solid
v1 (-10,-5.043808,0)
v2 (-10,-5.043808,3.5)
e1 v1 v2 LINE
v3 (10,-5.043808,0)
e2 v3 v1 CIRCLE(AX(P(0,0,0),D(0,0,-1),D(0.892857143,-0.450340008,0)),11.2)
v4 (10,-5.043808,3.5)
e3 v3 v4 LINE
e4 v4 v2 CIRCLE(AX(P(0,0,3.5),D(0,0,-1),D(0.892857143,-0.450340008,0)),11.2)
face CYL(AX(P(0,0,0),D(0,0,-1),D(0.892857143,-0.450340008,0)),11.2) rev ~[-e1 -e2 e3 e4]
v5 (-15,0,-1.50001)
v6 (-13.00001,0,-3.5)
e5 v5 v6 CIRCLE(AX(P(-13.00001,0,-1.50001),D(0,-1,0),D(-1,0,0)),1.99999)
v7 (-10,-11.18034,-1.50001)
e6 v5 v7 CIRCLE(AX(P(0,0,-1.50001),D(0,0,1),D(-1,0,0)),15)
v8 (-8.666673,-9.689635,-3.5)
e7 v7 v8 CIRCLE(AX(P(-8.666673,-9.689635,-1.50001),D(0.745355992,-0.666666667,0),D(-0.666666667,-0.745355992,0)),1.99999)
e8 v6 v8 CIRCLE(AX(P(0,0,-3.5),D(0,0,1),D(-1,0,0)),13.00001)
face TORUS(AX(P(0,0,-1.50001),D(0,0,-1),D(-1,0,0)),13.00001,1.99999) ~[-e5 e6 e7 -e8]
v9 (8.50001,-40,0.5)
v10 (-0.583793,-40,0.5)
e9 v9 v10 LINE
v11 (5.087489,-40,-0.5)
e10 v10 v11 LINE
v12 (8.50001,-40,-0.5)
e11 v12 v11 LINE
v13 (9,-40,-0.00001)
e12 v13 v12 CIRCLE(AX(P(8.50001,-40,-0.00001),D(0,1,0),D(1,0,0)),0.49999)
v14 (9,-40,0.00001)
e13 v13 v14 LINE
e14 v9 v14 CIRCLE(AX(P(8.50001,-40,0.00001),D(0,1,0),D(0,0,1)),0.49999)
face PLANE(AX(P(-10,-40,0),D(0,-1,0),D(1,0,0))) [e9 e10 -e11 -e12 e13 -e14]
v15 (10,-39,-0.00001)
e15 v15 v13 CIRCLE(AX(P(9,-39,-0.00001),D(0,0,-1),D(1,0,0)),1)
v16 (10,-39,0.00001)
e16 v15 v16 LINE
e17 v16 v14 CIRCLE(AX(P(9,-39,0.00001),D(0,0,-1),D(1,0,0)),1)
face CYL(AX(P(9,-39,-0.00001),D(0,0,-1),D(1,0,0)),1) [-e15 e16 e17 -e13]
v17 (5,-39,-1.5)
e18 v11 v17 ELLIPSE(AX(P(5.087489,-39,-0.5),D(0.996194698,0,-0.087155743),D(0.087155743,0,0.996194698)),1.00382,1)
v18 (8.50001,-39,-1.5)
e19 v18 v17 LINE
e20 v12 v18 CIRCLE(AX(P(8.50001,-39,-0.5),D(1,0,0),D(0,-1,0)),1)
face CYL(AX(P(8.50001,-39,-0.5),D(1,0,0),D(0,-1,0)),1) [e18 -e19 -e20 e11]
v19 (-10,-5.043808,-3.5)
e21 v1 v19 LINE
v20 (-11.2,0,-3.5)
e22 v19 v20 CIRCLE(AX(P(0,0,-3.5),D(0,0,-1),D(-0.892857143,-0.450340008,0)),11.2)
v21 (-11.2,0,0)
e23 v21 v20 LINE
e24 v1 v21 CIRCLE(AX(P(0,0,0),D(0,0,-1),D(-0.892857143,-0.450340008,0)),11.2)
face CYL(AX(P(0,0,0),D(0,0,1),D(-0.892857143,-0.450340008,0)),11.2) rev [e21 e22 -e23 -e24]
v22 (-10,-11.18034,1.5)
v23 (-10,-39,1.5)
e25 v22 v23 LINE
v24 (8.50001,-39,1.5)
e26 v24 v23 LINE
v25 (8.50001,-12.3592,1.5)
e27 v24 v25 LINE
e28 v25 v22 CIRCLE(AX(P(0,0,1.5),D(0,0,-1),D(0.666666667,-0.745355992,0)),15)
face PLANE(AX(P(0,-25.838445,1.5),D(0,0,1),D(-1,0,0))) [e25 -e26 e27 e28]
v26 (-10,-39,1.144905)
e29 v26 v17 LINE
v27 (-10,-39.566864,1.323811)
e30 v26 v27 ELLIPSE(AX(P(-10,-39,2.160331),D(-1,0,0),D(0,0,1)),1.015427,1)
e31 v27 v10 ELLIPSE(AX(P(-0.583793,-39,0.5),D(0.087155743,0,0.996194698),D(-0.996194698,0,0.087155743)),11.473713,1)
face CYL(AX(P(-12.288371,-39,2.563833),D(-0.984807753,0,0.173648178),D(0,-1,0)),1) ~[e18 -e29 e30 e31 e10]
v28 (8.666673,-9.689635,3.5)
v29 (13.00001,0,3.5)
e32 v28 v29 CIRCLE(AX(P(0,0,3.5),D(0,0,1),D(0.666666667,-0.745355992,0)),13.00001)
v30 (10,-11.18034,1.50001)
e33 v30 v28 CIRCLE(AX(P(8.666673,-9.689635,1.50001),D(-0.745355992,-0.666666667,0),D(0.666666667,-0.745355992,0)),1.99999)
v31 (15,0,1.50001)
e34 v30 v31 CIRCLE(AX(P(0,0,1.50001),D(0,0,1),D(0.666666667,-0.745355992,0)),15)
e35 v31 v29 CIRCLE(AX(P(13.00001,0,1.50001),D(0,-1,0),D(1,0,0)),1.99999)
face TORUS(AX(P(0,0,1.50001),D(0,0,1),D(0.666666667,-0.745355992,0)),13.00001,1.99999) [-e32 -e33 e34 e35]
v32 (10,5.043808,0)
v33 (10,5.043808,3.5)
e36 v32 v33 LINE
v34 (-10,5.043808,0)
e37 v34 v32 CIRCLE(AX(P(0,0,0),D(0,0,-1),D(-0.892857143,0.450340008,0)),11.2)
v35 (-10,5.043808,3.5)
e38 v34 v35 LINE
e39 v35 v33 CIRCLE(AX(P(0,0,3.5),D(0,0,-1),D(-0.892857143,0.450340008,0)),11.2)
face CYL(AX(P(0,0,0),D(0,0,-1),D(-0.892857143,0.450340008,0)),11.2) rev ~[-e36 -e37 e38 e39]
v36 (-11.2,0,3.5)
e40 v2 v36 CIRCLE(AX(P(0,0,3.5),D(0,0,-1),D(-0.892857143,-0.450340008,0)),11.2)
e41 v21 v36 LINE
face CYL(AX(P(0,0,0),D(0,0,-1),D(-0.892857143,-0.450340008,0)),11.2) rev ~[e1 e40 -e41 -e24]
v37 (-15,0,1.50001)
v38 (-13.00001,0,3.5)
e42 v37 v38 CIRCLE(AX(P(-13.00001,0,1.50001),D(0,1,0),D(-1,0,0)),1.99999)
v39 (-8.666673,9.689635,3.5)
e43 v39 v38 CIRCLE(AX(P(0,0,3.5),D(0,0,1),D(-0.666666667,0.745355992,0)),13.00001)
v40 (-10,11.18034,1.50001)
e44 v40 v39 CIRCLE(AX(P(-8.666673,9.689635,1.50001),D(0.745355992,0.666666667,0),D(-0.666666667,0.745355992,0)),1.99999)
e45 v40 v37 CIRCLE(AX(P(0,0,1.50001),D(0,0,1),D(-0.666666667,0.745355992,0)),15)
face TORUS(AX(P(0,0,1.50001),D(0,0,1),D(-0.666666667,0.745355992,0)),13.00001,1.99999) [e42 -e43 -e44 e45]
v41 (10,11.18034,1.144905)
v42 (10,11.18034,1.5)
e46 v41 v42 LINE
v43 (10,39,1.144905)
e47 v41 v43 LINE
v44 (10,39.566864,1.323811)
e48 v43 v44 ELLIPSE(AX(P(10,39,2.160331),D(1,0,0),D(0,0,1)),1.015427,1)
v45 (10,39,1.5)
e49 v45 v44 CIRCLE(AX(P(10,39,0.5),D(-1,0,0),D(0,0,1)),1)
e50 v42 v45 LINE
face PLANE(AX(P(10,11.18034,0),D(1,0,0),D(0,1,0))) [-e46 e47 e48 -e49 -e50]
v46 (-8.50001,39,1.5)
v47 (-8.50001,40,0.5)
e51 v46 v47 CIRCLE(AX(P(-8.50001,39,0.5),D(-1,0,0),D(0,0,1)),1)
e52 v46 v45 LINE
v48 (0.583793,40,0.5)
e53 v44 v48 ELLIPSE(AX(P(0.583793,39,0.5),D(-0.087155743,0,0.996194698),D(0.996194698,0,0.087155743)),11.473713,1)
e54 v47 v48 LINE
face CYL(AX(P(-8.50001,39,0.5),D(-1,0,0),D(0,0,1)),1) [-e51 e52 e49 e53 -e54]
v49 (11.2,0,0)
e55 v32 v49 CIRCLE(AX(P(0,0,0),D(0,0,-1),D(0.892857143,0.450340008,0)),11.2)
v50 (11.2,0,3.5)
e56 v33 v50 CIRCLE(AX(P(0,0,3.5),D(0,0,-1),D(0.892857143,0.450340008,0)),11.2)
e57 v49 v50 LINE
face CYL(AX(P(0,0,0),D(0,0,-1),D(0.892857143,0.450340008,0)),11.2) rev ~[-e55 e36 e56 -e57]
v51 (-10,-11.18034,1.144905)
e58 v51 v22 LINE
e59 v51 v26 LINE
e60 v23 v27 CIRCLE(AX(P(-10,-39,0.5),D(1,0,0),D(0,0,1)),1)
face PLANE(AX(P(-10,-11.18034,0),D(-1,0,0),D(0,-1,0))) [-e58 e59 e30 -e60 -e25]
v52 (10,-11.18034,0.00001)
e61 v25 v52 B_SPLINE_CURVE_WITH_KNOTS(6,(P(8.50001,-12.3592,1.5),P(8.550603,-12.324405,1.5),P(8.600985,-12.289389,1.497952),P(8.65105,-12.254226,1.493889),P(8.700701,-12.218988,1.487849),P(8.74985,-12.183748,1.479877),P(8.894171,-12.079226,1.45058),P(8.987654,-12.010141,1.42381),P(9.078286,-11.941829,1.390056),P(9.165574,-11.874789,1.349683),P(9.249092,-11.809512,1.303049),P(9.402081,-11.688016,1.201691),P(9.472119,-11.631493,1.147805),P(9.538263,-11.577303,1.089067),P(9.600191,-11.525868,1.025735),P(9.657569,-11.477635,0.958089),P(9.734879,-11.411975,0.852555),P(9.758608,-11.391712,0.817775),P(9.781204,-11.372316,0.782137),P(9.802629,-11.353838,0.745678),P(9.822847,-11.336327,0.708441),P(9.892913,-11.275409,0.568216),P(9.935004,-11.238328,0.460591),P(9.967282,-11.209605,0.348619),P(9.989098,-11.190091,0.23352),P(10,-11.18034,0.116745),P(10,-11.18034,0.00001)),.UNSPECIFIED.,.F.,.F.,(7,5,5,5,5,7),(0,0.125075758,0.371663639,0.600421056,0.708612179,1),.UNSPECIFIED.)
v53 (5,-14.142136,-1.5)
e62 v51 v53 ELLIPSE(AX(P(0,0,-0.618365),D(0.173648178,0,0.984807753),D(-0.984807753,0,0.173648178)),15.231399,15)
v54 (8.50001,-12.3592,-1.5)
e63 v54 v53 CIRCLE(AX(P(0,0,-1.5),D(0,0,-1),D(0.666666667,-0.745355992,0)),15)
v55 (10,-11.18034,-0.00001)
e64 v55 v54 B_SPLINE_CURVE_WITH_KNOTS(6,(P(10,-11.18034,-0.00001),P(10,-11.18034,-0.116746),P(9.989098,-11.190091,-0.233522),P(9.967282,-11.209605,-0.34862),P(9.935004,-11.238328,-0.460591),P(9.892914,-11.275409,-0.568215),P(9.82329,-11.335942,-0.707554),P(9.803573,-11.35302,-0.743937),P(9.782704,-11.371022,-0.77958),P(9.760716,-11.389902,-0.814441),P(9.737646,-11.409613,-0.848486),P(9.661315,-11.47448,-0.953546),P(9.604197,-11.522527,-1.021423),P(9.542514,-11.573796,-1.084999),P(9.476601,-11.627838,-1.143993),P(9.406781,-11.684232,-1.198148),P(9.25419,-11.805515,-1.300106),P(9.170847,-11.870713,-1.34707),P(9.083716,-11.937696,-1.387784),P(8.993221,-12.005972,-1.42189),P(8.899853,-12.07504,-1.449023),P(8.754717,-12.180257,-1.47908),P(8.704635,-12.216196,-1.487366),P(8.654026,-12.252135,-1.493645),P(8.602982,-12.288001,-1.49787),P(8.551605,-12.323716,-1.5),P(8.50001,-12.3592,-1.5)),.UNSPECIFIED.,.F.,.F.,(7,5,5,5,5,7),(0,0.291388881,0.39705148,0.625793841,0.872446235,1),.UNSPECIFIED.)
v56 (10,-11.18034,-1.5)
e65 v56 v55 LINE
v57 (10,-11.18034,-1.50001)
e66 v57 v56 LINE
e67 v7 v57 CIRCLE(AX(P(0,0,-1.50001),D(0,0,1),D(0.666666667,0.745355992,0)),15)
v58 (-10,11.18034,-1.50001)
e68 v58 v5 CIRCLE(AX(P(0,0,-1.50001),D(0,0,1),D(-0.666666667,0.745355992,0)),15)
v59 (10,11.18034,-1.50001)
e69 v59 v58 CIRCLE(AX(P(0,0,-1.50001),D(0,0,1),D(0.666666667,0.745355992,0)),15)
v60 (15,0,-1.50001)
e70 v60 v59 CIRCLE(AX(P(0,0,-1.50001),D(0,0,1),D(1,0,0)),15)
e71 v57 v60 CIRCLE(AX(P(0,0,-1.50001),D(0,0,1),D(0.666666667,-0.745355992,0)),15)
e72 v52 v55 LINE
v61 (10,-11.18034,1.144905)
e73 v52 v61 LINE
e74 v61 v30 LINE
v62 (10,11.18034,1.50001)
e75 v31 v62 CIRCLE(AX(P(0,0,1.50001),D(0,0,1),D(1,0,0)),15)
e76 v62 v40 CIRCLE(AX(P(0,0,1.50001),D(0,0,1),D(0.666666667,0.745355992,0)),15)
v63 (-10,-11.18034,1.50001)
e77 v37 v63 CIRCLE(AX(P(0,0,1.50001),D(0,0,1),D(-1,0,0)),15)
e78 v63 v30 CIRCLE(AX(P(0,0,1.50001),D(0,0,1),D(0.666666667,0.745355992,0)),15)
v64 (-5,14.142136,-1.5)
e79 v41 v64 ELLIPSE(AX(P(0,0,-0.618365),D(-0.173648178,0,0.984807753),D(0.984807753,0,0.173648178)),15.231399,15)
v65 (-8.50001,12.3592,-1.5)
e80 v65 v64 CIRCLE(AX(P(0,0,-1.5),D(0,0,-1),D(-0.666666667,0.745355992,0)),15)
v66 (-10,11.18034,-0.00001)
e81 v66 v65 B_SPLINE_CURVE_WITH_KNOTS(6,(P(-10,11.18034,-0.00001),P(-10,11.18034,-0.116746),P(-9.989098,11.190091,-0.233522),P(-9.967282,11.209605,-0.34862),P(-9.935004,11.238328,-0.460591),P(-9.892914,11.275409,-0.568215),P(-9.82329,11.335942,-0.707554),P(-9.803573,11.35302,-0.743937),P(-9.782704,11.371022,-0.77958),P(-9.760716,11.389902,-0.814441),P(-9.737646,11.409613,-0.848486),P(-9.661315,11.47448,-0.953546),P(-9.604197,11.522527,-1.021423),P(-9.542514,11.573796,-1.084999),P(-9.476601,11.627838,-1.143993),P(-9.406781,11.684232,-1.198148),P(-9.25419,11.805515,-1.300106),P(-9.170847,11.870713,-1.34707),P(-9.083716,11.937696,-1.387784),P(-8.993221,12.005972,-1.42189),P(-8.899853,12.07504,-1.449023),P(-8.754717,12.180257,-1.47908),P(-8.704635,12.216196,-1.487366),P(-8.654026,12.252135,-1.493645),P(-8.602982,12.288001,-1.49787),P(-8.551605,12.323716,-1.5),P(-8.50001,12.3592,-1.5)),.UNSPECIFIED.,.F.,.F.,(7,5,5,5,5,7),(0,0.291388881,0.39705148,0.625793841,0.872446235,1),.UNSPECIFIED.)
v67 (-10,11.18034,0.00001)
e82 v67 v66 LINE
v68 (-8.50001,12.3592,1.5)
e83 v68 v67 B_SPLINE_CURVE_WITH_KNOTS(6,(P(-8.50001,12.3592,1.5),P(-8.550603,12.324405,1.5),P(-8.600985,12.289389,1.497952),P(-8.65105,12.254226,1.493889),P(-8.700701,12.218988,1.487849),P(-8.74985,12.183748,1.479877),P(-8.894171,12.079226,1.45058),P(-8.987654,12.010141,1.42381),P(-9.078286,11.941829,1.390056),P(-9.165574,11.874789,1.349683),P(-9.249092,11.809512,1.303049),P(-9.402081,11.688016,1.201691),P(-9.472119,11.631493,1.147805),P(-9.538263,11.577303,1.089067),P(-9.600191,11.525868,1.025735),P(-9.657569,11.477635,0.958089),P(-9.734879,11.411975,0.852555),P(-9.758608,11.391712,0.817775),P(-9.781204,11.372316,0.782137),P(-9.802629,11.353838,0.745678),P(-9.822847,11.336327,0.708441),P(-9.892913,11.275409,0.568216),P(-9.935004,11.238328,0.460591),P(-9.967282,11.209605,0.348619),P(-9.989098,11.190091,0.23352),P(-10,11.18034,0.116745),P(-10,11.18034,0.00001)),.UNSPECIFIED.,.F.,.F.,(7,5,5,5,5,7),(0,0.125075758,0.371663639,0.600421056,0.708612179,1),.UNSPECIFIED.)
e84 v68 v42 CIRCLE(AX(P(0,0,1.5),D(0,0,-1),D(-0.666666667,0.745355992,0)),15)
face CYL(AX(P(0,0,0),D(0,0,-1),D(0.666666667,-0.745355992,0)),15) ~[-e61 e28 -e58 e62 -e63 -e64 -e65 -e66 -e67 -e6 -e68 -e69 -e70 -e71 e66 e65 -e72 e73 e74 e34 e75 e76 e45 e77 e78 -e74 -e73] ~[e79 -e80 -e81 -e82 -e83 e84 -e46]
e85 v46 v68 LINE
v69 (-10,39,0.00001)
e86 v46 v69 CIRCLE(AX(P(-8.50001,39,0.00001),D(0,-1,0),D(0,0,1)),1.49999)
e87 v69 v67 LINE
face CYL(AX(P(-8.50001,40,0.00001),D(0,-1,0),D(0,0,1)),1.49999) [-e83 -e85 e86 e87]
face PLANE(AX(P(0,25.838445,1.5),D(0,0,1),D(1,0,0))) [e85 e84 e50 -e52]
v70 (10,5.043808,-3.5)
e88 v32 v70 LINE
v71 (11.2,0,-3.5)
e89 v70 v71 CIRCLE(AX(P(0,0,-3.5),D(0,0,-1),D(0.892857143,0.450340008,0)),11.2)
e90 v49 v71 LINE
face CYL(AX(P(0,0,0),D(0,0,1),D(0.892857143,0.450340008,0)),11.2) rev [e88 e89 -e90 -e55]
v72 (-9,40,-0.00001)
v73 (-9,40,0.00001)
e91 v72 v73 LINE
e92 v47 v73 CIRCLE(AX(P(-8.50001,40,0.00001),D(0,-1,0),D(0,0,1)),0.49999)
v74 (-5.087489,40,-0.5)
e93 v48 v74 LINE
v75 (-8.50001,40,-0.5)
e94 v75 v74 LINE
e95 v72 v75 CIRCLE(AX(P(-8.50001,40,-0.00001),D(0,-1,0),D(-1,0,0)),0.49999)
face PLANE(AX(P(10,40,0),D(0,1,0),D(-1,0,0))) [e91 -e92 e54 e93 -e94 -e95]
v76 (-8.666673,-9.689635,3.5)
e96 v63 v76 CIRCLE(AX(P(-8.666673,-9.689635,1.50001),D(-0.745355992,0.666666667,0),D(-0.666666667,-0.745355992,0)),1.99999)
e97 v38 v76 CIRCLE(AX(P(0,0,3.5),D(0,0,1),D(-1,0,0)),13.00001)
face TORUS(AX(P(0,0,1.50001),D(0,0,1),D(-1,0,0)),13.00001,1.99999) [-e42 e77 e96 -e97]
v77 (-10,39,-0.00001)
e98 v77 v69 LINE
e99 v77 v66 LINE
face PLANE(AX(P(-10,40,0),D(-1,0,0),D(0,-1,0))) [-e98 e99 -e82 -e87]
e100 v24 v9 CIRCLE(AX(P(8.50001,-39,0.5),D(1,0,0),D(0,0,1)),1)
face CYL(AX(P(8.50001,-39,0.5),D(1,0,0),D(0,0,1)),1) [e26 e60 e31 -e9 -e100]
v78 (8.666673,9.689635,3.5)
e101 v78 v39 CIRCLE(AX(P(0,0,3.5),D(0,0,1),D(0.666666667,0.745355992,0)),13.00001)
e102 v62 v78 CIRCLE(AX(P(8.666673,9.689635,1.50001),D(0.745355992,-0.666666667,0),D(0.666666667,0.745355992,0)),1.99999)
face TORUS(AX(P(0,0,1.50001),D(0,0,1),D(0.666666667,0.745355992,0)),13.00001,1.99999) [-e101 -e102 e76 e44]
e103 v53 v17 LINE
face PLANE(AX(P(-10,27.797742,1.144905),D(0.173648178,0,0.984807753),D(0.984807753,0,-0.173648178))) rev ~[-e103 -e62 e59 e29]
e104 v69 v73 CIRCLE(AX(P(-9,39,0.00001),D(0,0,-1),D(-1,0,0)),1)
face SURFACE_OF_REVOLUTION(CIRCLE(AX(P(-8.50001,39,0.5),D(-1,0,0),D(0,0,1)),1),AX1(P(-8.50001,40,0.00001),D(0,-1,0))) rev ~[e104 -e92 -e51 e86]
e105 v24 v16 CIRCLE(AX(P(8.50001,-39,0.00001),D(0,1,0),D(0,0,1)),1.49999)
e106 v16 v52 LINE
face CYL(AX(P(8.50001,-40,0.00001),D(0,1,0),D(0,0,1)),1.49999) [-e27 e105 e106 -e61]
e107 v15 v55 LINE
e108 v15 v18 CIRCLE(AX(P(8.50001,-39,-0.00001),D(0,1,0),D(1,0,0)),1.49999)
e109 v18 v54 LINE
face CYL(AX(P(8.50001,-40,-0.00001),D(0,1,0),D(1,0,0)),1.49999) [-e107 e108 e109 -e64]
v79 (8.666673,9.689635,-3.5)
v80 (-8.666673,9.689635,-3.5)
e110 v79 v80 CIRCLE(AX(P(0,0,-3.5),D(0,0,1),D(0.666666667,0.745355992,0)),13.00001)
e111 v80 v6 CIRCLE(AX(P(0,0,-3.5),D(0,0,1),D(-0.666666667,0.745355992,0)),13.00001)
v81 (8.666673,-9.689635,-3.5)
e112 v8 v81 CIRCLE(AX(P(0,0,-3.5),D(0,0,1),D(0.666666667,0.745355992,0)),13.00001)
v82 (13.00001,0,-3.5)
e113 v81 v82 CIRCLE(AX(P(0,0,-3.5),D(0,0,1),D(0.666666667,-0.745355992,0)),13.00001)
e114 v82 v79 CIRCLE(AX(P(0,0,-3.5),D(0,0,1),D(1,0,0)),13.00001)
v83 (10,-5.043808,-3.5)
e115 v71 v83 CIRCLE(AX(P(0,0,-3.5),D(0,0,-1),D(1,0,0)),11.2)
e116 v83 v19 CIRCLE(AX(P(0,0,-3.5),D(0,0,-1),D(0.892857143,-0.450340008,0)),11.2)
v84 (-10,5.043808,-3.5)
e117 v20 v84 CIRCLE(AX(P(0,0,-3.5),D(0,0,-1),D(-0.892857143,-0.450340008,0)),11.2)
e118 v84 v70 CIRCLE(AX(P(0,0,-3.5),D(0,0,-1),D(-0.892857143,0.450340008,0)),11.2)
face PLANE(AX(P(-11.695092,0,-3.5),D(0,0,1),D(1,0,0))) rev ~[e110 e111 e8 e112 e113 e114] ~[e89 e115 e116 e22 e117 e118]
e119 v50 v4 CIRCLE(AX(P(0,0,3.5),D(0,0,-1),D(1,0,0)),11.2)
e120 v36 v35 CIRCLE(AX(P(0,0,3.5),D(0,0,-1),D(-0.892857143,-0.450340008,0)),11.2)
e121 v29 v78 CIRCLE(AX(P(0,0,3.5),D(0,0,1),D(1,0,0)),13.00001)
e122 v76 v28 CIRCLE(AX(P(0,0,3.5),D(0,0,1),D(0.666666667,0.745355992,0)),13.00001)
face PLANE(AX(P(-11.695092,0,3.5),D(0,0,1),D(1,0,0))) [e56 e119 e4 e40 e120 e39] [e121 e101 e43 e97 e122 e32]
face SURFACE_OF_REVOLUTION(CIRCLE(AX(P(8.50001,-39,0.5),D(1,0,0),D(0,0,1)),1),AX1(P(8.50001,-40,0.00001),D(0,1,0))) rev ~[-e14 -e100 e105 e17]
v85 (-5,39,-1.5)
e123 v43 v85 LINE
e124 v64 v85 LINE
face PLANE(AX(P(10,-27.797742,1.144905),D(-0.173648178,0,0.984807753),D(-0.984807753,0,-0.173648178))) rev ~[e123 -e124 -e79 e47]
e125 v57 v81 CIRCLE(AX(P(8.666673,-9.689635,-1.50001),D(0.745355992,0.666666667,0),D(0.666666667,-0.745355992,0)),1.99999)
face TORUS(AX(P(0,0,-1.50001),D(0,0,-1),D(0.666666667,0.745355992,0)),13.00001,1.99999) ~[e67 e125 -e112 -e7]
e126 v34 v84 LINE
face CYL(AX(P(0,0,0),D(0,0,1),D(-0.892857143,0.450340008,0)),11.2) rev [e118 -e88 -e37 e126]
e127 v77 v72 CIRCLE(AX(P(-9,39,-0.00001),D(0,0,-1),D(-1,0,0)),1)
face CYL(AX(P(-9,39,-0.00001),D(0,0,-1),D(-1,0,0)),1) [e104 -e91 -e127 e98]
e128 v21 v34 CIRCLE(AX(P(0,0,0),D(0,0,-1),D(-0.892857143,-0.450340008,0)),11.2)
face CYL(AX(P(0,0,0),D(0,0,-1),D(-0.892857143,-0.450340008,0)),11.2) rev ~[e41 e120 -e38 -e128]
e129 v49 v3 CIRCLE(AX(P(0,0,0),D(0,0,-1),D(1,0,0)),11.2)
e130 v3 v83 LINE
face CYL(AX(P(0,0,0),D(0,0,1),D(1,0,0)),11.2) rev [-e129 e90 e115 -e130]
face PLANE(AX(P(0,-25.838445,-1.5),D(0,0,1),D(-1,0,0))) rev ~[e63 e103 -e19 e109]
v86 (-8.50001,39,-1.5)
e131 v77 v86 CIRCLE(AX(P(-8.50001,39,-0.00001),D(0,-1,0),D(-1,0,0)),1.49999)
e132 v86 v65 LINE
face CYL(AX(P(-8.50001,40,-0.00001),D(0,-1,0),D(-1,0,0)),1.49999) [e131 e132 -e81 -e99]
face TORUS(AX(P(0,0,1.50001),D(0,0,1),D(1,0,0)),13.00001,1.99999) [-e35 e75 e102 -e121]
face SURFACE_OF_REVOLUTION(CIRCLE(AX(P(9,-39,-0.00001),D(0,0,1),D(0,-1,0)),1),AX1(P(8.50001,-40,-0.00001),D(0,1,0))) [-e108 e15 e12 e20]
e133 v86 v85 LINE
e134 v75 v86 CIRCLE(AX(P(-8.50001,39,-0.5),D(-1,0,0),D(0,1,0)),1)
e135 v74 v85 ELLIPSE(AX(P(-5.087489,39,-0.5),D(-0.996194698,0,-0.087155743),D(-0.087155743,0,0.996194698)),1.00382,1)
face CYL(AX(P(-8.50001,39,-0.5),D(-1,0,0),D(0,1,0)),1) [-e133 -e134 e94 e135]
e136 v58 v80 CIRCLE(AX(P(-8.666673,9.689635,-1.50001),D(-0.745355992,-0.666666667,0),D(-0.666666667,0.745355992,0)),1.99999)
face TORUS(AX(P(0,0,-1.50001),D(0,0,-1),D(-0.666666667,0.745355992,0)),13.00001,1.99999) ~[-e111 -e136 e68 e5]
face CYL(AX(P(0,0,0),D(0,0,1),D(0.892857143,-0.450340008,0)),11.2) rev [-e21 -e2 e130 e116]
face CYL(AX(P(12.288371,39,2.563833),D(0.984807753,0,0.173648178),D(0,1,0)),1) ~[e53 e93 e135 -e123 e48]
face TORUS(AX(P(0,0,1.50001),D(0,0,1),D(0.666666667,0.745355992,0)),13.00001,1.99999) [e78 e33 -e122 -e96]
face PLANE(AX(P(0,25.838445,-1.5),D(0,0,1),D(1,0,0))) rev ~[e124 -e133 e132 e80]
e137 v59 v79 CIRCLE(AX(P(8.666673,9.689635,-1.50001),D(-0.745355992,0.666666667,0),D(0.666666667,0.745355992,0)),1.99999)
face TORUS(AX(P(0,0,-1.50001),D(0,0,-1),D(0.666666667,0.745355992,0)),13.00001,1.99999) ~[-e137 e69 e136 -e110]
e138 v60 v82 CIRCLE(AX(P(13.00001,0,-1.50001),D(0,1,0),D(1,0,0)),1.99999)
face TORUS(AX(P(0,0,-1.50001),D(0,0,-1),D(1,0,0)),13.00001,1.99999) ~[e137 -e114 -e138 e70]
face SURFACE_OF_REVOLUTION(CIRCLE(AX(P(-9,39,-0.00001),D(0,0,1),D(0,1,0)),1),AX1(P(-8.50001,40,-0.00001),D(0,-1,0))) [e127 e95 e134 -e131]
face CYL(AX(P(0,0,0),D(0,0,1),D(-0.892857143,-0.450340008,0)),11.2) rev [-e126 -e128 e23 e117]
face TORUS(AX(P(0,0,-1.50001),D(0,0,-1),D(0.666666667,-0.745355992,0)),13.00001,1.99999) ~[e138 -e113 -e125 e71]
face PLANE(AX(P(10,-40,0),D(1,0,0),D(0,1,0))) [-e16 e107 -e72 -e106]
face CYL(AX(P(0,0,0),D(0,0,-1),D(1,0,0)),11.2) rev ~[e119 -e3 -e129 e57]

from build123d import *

# Parameters (mm, degrees)
F1_DEPTH      = 3.5
F1_DEPTH_BACK = 3.5
F2_DEPTH      = 1.5
F2_DEPTH_BACK = 1.5
F3_R          = 1.99999
F4_T4_DEPTH   = 106.7758240051
F4_S5_R       = 15
F4_T6_DEPTH   = 55
F5_R          = 1.49999
F7_T1_DEPTH   = 11.00001
F7_T3_DEPTH   = 25.2313991783
F7_T5_DEPTH   = 21.00001
F7_T7_DEPTH   = 2e-05
F7_T10_ANGLE  = 90
F7_T12_ANGLE  = 90
F8_COUNT      = 2


# Not quite as in the source:
# - a fillet or chamfer that OpenCascade refuses, or shapes differently, is made with other operations: its cross-section is extruded or revolved along the edge and cut away or added
# - a fillet or chamfer is up to 0.001 mm smaller than in the source, because OpenCascade refuses the exact size
# - a feature names something its author has since deleted; it is built from what else it names


with BuildPart() as f1:
    # F0 (on Top) → F1 (new body, two sides)
    with BuildSketch(Plane.XY) as f1_sk:
        with BuildLine():
            ThreePointArc((-10, -5.0438080852), (-11.2, 0), (-10, 5.0438080852))
            Line((-10, 5.0438080852), (-10, 11.1803398875))
            ThreePointArc((-10, 11.1803398875), (-15, 0), (-10, -11.1803398875))
            Line((-10, -11.1803398875), (-10, -5.0438080852))
        make_face()
        with BuildLine():
            ThreePointArc((-10, 5.0438080852), (0, 11.2), (10, 5.0438080852))
            Line((10, 5.0438080852), (10, 11.1803398875))
            ThreePointArc((10, 11.1803398875), (0, 15), (-10, 11.1803398875))
            Line((-10, 11.1803398875), (-10, 5.0438080852))
        make_face()
        with BuildLine():
            ThreePointArc((10, 5.0438080852), (10.8958707775, 2.5922962794), (11.2, 0))
            ThreePointArc((11.2, 0), (10.8958707775, -2.5922962794), (10, -5.0438080852))
            Line((10, -5.0438080852), (10, -11.1803398875))
            ThreePointArc((10, -11.1803398875), (13.6930639376, -6.123724357), (15, 0))
            ThreePointArc((15, 0), (13.6930639376, 6.123724357), (10, 11.1803398875))
            Line((10, 11.1803398875), (10, 5.0438080852))
        make_face()
        with BuildLine():
            Line((10, -11.1803398875), (10, -5.0438080852))
            ThreePointArc((10, -5.0438080852), (0, -11.2), (-10, -5.0438080852))
            Line((-10, -5.0438080852), (-10, -11.1803398875))
            ThreePointArc((-10, -11.1803398875), (0, -15), (10, -11.1803398875))
        make_face()
    extrude(amount=F1_DEPTH)
    extrude(f1_sk.sketch, amount=-F1_DEPTH_BACK)

    # F0 (on Top) → F2 (join, two sides)
    with BuildSketch(Plane.XY) as f2_sk:
        with BuildLine():
            ThreePointArc((-10, 11.1803398875), (0, 15), (10, 11.1803398875))
            Line((10, 11.1803398875), (10, 40))
            Line((10, 40), (-10, 40))
            Line((-10, 40), (-10, 11.1803398875))
        make_face()
    extrude(amount=F2_DEPTH)
    extrude(f2_sk.sketch, amount=-F2_DEPTH_BACK)

    # F3 (radius 2 in the source; OpenCascade refuses exactly that, so slightly less here)
    f3_edges = [f1.edges().sort_by_distance(p)[0] for p in [
        (10, 11.18034, 3.5),
        (10, 11.18034, -3.5),
    ]]
    fillet(f3_edges, radius=F3_R)

    # F4: chamfer of 15 x 2.6449047106 on 1 edges, made by hand


with BuildPart() as f4_tool2:
    # F4_s3 → F4_t4 (new body)
    with BuildSketch(Plane.XZ.offset(27.7977420588)):
        Polygon((10, 1.1449047106), (-5, -1.5), (10, -1.5), align=None)
    extrude(amount=-F4_T4_DEPTH)

    # F4_s5 → F4_t6 (cut, symmetric)
    with BuildSketch(Plane.XY.offset(-0.2)):
        Circle(F4_S5_R)
    extrude(amount=F4_T6_DEPTH, both=True, mode=Mode.SUBTRACT)


with BuildPart() as f1_1:
    add(f1.part)

    # F4_t1: cut F4_tool2
    add(f4_tool2.part, mode=Mode.SUBTRACT)

    # F5 (radius 1.5 in the source; OpenCascade refuses exactly that, so slightly less here)
    f5_edges = [f1_1.edges().sort_by_distance(p)[0] for p in [
        (-10, 25.59017, -1.5),
        (-10, 25.59017, 1.5),
    ]]
    fillet(f5_edges, radius=F5_R)

    # F7: fillet of radius 1 on 6 edges, made by hand

    # F7_s2 → F7_t1 (cut)
    with BuildSketch(Plane.YZ.offset(-8.50001)):
        with BuildLine():
            ThreePointArc((40, -0.5), (39.7071067812, -1.2071067812), (39, -1.5))
            Line((39, -1.5), (40, -1.5))
            Line((40, -1.5), (40, -0.5))
        make_face()
    extrude(amount=F7_T1_DEPTH, mode=Mode.SUBTRACT)

    # F7_s4 → F7_t3 (cut)
    with BuildSketch(Plane(origin=(12.3562727231, 0, 2.178744262), x_dir=(0, 1, 0), z_dir=(-0.984807753, 0, -0.1736481777))):
        with BuildLine():
            ThreePointArc((40, -0.3910292588), (39.7071067812, 0.3160775224), (39, 0.6089707412))
            Line((39, 0.6089707412), (40, 0.6089707412))
            Line((40, 0.6089707412), (40, -0.3910292588))
        make_face()
    extrude(amount=F7_T3_DEPTH, mode=Mode.SUBTRACT)

    # F7_s6 → F7_t5 (cut)
    with BuildSketch(Plane.YZ.offset(-8.50001)):
        with BuildLine():
            ThreePointArc((39, 1.5), (39.7071067812, 1.2071067812), (40, 0.5))
            Line((40, 0.5), (40, 1.5))
            Line((40, 1.5), (39, 1.5))
        make_face()
    extrude(amount=F7_T5_DEPTH, mode=Mode.SUBTRACT)

    # F7_s8 → F7_t7 (cut)
    with BuildSketch(Plane.XY.offset(-1e-05)):
        with BuildLine():
            ThreePointArc((-10, 39), (-9.7071067812, 39.7071067812), (-9, 40))
            Line((-9, 40), (-10, 40))
            Line((-10, 40), (-10, 39))
        make_face()
    extrude(amount=F7_T7_DEPTH, mode=Mode.SUBTRACT)

    # F7_s9 → F7_t10 (revolve, cut)
    with BuildSketch(Plane.XY.offset(-1e-05)):
        with BuildLine():
            ThreePointArc((-9, 40), (-9.7071067812, 39.7071067812), (-10, 39))
            Line((-10, 39), (-10, 40))
            Line((-10, 40), (-9, 40))
        make_face()
    revolve(axis=Axis((-8.50001, 40, -1e-05), (0, -1, 0)), revolution_arc=F7_T10_ANGLE, mode=Mode.SUBTRACT)

    # F7_s11 → F7_t12 (revolve, cut)
    with BuildSketch(Plane.YZ.offset(-8.50001)):
        with BuildLine():
            ThreePointArc((39, 1.5), (39.7071067812, 1.2071067812), (40, 0.5))
            Line((40, 0.5), (40, 1.5))
            Line((40, 1.5), (39, 1.5))
        make_face()
    revolve(axis=Axis((-8.50001, 40, 1e-05), (0, -1, 0)), revolution_arc=F7_T12_ANGLE, mode=Mode.SUBTRACT)

    # F8: F1 ×2 about axis
    f8_axis = Axis((0, 0, -0.2721771598), (0, 0, -1))


with BuildPart() as f1_2:
    add(f1_1.part)
    for i in range(1, F8_COUNT):
        add(f1_1.part.rotate(f8_axis, i * 360 / F8_COUNT))


solid = f1_2.part
